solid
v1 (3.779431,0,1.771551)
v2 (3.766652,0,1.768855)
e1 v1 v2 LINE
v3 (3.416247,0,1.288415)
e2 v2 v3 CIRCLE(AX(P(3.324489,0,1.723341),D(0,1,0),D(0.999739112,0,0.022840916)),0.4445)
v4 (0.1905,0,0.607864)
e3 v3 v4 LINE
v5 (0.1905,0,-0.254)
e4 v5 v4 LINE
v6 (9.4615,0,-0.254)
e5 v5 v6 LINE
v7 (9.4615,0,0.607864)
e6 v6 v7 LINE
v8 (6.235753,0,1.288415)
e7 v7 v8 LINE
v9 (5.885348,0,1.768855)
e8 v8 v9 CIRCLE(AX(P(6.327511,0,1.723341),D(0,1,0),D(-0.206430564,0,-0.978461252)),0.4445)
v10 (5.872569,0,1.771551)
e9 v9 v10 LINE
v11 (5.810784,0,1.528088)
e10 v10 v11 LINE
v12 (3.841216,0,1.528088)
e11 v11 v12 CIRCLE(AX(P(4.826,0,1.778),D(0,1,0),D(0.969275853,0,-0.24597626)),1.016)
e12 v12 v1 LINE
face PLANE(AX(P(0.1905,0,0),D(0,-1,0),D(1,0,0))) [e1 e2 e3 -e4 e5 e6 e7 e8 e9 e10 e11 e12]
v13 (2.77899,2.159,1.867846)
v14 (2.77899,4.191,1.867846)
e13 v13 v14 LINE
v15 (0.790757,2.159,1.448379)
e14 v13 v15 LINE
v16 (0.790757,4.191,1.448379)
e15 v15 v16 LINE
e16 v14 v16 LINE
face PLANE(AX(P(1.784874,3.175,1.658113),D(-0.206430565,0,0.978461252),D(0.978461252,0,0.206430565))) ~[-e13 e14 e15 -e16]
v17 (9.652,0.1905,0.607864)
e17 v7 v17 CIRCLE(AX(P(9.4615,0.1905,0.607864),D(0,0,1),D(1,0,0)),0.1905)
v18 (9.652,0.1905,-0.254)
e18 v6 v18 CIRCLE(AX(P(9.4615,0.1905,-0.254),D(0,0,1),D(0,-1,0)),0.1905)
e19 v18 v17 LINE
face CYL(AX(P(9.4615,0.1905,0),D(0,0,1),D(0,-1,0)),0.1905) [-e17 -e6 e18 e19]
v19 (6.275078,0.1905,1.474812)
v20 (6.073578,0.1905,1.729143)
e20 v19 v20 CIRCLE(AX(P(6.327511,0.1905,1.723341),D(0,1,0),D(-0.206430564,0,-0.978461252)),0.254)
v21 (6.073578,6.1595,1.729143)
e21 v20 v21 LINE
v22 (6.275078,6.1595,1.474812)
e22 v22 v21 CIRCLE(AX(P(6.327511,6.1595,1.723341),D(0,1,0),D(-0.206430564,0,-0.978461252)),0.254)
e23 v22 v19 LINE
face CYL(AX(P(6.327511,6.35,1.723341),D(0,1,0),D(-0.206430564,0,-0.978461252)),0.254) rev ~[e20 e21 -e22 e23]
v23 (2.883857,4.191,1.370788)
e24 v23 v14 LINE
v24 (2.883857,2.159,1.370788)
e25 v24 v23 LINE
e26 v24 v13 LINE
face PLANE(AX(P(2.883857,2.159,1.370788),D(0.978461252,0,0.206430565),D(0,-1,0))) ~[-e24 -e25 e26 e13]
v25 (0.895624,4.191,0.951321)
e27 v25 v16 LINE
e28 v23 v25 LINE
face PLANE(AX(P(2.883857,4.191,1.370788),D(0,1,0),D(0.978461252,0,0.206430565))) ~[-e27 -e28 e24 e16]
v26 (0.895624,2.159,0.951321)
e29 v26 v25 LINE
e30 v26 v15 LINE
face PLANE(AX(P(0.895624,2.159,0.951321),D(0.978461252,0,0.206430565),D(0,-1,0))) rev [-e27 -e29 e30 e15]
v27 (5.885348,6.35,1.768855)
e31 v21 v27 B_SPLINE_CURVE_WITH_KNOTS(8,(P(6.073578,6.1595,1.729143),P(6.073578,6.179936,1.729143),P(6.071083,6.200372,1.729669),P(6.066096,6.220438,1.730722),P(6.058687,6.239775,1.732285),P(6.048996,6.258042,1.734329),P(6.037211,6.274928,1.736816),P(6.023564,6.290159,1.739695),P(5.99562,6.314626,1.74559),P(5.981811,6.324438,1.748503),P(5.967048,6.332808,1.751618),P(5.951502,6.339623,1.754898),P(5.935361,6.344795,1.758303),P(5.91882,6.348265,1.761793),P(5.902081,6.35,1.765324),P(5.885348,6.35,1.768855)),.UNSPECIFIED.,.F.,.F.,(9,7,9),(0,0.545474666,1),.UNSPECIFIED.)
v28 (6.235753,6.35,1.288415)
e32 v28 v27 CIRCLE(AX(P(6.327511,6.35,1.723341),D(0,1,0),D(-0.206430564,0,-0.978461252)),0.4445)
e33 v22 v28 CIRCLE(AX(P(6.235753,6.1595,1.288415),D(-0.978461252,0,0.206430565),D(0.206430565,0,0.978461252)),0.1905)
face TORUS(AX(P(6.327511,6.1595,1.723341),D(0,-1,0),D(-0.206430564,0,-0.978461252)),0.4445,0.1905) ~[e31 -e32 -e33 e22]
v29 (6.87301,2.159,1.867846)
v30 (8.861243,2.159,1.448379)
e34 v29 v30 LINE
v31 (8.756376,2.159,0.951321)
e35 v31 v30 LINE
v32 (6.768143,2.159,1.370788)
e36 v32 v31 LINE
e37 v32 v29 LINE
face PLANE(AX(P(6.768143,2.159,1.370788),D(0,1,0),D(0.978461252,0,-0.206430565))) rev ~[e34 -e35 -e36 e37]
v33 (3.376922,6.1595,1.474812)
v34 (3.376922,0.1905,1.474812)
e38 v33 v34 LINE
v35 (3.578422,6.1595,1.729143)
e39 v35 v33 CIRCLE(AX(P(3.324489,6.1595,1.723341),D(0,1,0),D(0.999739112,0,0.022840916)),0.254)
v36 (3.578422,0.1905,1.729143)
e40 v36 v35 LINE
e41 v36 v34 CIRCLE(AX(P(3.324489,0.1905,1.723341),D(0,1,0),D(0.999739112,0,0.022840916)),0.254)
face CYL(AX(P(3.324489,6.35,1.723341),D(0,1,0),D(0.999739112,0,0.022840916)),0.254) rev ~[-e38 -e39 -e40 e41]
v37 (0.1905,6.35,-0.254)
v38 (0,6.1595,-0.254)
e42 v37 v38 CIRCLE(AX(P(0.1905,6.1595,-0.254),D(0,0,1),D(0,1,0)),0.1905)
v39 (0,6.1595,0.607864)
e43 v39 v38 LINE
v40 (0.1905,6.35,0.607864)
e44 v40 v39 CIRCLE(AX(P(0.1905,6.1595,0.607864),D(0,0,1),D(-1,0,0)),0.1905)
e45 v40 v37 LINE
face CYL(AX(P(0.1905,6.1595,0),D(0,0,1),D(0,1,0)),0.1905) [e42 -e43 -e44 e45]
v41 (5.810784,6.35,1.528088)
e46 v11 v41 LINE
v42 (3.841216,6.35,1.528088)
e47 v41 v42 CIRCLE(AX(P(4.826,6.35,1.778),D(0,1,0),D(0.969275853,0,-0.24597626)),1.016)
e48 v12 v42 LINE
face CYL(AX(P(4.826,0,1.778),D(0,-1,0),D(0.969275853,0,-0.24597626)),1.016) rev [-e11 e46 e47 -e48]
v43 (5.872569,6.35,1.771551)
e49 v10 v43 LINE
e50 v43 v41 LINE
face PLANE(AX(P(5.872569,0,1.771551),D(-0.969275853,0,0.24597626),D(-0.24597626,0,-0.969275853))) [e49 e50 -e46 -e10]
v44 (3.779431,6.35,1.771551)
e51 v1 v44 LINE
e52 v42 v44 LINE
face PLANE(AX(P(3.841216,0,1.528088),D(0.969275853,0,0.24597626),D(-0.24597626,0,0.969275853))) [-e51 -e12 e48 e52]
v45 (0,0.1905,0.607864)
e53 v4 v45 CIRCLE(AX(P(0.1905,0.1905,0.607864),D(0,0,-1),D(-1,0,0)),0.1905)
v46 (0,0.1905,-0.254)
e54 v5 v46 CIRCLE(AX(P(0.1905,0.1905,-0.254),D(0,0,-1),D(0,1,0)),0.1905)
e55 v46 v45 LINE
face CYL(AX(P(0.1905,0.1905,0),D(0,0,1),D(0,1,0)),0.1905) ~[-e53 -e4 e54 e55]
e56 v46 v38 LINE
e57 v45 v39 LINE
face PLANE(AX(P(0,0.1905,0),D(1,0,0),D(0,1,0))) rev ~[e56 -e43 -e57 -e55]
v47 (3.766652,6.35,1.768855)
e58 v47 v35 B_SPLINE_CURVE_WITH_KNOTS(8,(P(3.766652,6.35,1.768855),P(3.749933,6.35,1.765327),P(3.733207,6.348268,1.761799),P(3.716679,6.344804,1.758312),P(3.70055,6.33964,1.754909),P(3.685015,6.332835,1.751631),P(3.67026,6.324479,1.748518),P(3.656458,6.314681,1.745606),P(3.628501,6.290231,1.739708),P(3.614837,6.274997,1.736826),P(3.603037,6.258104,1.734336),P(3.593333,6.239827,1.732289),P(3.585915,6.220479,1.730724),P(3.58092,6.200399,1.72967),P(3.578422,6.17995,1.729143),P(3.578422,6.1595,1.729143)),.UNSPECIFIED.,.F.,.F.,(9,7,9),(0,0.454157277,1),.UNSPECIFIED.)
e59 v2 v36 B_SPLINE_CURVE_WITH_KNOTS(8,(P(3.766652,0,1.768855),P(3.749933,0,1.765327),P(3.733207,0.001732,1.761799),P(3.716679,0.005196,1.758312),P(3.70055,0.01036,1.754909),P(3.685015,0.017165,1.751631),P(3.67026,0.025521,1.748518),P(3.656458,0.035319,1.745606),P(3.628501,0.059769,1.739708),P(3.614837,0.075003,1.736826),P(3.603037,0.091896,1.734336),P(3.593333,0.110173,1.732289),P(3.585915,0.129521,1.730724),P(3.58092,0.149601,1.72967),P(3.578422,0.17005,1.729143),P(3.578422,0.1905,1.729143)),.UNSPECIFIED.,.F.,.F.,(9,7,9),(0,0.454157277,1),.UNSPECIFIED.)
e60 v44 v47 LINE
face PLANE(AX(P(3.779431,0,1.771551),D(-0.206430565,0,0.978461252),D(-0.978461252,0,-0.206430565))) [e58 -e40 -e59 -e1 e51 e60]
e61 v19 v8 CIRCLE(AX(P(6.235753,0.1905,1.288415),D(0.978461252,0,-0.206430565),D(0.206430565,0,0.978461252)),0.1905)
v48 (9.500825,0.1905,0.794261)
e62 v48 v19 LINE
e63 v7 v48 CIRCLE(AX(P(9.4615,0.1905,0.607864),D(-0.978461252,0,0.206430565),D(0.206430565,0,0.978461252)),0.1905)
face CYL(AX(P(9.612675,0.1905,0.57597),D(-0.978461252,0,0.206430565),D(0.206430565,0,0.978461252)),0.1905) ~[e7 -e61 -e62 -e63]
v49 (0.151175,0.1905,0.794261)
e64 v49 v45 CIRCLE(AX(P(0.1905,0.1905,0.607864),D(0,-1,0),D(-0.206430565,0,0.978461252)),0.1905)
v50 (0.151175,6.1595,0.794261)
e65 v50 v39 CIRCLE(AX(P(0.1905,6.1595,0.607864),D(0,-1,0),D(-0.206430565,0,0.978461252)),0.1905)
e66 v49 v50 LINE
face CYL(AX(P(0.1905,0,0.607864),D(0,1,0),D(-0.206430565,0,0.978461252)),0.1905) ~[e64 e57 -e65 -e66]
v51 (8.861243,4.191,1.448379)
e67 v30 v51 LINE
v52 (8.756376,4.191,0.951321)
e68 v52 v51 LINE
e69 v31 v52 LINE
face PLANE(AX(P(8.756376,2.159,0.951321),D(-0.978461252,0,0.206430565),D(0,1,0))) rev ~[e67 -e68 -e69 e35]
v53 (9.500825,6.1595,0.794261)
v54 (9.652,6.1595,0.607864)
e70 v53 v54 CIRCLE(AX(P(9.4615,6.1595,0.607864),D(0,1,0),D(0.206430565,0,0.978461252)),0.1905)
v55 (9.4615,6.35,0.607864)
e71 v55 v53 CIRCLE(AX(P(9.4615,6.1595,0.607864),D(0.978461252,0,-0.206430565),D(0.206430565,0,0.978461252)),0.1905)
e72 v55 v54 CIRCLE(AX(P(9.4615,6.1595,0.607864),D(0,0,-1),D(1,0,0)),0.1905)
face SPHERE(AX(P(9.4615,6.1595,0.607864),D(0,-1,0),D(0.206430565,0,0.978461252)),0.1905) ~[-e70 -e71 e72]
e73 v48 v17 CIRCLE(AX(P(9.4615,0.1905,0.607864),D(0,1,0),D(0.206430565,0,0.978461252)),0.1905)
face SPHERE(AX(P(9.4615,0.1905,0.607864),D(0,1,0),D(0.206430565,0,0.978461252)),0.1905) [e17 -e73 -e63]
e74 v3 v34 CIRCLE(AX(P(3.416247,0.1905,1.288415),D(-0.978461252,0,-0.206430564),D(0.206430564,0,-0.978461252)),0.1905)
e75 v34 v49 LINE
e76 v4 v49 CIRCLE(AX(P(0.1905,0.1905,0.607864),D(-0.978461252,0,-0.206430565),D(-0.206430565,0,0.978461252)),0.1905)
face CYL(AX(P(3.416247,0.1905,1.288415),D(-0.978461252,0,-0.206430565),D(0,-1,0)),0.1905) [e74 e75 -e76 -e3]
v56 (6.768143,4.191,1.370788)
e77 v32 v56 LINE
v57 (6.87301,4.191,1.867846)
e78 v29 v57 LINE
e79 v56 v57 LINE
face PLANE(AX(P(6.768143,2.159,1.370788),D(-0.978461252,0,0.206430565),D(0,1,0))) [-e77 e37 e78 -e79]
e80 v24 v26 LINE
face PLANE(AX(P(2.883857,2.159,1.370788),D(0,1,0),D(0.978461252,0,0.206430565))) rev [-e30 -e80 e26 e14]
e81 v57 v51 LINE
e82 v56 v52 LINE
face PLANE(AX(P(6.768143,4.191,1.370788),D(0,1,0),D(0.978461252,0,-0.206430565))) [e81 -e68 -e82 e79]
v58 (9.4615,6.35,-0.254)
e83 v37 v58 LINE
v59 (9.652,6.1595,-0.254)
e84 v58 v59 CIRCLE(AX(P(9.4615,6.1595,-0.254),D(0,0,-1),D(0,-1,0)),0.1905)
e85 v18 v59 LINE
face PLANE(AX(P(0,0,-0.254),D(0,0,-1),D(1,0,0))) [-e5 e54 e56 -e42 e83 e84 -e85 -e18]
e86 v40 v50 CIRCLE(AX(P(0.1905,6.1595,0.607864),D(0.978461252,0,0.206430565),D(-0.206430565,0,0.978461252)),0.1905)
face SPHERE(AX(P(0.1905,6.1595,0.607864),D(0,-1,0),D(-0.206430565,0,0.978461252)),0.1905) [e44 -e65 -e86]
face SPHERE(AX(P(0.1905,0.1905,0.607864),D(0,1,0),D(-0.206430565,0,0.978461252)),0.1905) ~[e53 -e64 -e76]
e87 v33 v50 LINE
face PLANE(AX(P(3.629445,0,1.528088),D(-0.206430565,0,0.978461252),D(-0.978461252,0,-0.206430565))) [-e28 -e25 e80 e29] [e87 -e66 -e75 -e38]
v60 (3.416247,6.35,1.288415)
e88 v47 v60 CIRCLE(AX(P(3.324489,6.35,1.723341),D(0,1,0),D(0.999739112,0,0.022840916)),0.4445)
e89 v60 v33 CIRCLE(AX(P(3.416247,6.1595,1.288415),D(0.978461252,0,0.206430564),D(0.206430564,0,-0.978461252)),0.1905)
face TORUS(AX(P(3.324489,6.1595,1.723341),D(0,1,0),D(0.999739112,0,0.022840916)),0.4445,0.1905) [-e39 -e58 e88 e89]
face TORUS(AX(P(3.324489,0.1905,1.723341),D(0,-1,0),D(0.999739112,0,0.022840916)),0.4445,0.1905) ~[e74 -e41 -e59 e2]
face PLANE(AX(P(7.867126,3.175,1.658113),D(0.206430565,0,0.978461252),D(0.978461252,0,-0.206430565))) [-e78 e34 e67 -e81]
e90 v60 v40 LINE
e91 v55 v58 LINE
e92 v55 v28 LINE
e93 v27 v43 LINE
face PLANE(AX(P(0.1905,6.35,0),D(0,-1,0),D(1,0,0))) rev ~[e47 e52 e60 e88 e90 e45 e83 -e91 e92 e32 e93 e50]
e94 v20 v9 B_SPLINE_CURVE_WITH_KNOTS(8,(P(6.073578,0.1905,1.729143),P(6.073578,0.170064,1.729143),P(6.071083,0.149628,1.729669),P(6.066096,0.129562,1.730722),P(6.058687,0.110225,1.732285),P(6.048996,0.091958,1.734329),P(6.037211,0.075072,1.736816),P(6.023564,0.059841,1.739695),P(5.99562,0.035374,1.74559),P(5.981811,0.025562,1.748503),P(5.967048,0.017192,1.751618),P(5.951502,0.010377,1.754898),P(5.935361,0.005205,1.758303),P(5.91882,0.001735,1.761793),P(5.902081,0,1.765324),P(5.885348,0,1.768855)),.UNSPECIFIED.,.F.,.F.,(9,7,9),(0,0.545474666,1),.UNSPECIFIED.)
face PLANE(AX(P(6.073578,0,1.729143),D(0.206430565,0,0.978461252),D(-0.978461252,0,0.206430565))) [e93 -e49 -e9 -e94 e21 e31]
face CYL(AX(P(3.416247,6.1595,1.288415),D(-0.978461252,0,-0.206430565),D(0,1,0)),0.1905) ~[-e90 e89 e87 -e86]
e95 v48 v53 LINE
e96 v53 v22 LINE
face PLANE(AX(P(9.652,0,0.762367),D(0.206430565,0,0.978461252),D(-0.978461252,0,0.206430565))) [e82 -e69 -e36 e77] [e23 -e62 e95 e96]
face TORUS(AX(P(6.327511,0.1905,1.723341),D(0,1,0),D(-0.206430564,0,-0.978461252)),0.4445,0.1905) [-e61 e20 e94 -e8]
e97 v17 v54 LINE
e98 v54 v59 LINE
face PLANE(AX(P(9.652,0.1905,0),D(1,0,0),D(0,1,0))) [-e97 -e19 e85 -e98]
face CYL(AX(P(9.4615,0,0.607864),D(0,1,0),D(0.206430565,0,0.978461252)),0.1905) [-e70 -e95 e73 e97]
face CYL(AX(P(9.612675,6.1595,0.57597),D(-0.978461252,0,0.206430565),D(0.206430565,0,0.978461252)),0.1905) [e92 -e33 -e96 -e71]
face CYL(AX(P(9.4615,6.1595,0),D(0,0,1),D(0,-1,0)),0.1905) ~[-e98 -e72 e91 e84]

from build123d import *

# Parameters (mm, degrees)
F1_DEPTH    = 6.35
F4_T1_DEPTH = 6.35
F2_W        = 2.032
F2_H        = 2.032
F5_DEPTH    = 0.508
F7_R        = 0.1905
F12_DEPTH   = 0.254


# Not quite as in the source:
# - a fillet or chamfer that OpenCascade refuses, or shapes differently, is made with other operations: its cross-section is extruded or revolved along the edge and cut away or added


with BuildPart() as f1:
    # F0 (on Front) → F1 (new body)
    with BuildSketch(Plane.XZ):
        with BuildLine():
            Line((0, 0.7623671392), (0, 0))
            Line((0, 0), (9.652, 0))
            Line((9.652, 0), (9.652, 0.7623671392))
            Line((9.652, 0.7623671392), (6.0225553446, 1.5280881198))
            Line((6.0225553446, 1.5280881198), (6.0735776823, 1.729142969))
            Line((6.0735776823, 1.729142969), (5.8725685775, 1.7715508037))
            Line((5.8725685775, 1.7715508037), (5.8107842668, 1.5280881198))
            ThreePointArc((5.8107842668, 1.5280881198), (4.826, 0.762), (3.8412157332, 1.5280881198))
            Line((3.8412157332, 1.5280881198), (3.7794314225, 1.7715508037))
            Line((3.7794314225, 1.7715508037), (3.5784223177, 1.729142969))
            Line((3.5784223177, 1.729142969), (3.6294446554, 1.5280881198))
            Line((3.6294446554, 1.5280881198), (0, 0.7623671392))
        make_face()
    extrude(amount=-F1_DEPTH)

    # F4: fillet of radius 0.254 on 2 edges, made by hand

    # F4_s2 → F4_t1 (join)
    with BuildSketch(Plane.XZ.offset(-6.35)):
        with BuildLine():
            ThreePointArc((6.2750780534, 1.4748122183), (6.1284229129, 1.5656081597), (6.0735776823, 1.729142969))
            Line((6.0735776823, 1.729142969), (6.0225553446, 1.5280881198))
            Line((6.0225553446, 1.5280881198), (6.2750780534, 1.4748122183))
        make_face()
        with BuildLine():
            ThreePointArc((3.5784223177, 1.729142969), (3.5235770871, 1.5656081597), (3.3769219466, 1.4748122183))
            Line((3.3769219466, 1.4748122183), (3.6294446554, 1.5280881198))
            Line((3.6294446554, 1.5280881198), (3.5784223177, 1.729142969))
        make_face()
    extrude(amount=F4_T1_DEPTH)

    # F2 (on face) → F5 (join)
    with BuildSketch(Plane(origin=(0.5652924546, 0, 2.6794324958), x_dir=(0.9784612522, 0, -0.2064305646), z_dir=(0.2064305646, 0, 0.9784612522))):
        with Locations((7.3553929503, 3.175)):
            Rectangle(F2_W, F2_H)
    f5 = extrude(amount=F5_DEPTH)

    # F6: F5 across plane
    add(f5.mirror(Plane.YZ.offset(4.826)))

    # F7
    f7_edges = [f1.edges().sort_by_distance(p)[0] for p in [
        (9.652, 3.175, 0.762367),
        (0, 3.175, 0.762367),
        (7.963539, 6.35, 1.11859),
        (7.963539, 0, 1.11859),
        (1.688461, 0, 1.11859),
        (1.688461, 6.35, 1.11859),
        (9.652, 0, 0.381184),
        (9.652, 6.35, 0.381184),
        (0, 0, 0.381184),
        (0, 6.35, 0.381184),
        (3.523577, 6.35, 1.565608),
        (3.523577, 0, 1.565608),
        (6.128423, 0, 1.565608),
        (6.128423, 6.35, 1.565608),
    ]]
    fillet(f7_edges, radius=F7_R)


with BuildPart() as f8_1:
    # F8: copy of F1
    add(f1.part)


with BuildPart() as f9_1:
    # F9: copy of F8_1
    add(f8_1.part)


with BuildPart() as f1_1:
    add(f1.part)

    # F12 (add): a face of the model
    f12_faces = [f1_1.faces().sort_by_distance(p)[0] for p in [
        (4.826, 3.175, 0),
    ]]
    extrude(f12_faces, amount=F12_DEPTH)


solid = f1_1.part
